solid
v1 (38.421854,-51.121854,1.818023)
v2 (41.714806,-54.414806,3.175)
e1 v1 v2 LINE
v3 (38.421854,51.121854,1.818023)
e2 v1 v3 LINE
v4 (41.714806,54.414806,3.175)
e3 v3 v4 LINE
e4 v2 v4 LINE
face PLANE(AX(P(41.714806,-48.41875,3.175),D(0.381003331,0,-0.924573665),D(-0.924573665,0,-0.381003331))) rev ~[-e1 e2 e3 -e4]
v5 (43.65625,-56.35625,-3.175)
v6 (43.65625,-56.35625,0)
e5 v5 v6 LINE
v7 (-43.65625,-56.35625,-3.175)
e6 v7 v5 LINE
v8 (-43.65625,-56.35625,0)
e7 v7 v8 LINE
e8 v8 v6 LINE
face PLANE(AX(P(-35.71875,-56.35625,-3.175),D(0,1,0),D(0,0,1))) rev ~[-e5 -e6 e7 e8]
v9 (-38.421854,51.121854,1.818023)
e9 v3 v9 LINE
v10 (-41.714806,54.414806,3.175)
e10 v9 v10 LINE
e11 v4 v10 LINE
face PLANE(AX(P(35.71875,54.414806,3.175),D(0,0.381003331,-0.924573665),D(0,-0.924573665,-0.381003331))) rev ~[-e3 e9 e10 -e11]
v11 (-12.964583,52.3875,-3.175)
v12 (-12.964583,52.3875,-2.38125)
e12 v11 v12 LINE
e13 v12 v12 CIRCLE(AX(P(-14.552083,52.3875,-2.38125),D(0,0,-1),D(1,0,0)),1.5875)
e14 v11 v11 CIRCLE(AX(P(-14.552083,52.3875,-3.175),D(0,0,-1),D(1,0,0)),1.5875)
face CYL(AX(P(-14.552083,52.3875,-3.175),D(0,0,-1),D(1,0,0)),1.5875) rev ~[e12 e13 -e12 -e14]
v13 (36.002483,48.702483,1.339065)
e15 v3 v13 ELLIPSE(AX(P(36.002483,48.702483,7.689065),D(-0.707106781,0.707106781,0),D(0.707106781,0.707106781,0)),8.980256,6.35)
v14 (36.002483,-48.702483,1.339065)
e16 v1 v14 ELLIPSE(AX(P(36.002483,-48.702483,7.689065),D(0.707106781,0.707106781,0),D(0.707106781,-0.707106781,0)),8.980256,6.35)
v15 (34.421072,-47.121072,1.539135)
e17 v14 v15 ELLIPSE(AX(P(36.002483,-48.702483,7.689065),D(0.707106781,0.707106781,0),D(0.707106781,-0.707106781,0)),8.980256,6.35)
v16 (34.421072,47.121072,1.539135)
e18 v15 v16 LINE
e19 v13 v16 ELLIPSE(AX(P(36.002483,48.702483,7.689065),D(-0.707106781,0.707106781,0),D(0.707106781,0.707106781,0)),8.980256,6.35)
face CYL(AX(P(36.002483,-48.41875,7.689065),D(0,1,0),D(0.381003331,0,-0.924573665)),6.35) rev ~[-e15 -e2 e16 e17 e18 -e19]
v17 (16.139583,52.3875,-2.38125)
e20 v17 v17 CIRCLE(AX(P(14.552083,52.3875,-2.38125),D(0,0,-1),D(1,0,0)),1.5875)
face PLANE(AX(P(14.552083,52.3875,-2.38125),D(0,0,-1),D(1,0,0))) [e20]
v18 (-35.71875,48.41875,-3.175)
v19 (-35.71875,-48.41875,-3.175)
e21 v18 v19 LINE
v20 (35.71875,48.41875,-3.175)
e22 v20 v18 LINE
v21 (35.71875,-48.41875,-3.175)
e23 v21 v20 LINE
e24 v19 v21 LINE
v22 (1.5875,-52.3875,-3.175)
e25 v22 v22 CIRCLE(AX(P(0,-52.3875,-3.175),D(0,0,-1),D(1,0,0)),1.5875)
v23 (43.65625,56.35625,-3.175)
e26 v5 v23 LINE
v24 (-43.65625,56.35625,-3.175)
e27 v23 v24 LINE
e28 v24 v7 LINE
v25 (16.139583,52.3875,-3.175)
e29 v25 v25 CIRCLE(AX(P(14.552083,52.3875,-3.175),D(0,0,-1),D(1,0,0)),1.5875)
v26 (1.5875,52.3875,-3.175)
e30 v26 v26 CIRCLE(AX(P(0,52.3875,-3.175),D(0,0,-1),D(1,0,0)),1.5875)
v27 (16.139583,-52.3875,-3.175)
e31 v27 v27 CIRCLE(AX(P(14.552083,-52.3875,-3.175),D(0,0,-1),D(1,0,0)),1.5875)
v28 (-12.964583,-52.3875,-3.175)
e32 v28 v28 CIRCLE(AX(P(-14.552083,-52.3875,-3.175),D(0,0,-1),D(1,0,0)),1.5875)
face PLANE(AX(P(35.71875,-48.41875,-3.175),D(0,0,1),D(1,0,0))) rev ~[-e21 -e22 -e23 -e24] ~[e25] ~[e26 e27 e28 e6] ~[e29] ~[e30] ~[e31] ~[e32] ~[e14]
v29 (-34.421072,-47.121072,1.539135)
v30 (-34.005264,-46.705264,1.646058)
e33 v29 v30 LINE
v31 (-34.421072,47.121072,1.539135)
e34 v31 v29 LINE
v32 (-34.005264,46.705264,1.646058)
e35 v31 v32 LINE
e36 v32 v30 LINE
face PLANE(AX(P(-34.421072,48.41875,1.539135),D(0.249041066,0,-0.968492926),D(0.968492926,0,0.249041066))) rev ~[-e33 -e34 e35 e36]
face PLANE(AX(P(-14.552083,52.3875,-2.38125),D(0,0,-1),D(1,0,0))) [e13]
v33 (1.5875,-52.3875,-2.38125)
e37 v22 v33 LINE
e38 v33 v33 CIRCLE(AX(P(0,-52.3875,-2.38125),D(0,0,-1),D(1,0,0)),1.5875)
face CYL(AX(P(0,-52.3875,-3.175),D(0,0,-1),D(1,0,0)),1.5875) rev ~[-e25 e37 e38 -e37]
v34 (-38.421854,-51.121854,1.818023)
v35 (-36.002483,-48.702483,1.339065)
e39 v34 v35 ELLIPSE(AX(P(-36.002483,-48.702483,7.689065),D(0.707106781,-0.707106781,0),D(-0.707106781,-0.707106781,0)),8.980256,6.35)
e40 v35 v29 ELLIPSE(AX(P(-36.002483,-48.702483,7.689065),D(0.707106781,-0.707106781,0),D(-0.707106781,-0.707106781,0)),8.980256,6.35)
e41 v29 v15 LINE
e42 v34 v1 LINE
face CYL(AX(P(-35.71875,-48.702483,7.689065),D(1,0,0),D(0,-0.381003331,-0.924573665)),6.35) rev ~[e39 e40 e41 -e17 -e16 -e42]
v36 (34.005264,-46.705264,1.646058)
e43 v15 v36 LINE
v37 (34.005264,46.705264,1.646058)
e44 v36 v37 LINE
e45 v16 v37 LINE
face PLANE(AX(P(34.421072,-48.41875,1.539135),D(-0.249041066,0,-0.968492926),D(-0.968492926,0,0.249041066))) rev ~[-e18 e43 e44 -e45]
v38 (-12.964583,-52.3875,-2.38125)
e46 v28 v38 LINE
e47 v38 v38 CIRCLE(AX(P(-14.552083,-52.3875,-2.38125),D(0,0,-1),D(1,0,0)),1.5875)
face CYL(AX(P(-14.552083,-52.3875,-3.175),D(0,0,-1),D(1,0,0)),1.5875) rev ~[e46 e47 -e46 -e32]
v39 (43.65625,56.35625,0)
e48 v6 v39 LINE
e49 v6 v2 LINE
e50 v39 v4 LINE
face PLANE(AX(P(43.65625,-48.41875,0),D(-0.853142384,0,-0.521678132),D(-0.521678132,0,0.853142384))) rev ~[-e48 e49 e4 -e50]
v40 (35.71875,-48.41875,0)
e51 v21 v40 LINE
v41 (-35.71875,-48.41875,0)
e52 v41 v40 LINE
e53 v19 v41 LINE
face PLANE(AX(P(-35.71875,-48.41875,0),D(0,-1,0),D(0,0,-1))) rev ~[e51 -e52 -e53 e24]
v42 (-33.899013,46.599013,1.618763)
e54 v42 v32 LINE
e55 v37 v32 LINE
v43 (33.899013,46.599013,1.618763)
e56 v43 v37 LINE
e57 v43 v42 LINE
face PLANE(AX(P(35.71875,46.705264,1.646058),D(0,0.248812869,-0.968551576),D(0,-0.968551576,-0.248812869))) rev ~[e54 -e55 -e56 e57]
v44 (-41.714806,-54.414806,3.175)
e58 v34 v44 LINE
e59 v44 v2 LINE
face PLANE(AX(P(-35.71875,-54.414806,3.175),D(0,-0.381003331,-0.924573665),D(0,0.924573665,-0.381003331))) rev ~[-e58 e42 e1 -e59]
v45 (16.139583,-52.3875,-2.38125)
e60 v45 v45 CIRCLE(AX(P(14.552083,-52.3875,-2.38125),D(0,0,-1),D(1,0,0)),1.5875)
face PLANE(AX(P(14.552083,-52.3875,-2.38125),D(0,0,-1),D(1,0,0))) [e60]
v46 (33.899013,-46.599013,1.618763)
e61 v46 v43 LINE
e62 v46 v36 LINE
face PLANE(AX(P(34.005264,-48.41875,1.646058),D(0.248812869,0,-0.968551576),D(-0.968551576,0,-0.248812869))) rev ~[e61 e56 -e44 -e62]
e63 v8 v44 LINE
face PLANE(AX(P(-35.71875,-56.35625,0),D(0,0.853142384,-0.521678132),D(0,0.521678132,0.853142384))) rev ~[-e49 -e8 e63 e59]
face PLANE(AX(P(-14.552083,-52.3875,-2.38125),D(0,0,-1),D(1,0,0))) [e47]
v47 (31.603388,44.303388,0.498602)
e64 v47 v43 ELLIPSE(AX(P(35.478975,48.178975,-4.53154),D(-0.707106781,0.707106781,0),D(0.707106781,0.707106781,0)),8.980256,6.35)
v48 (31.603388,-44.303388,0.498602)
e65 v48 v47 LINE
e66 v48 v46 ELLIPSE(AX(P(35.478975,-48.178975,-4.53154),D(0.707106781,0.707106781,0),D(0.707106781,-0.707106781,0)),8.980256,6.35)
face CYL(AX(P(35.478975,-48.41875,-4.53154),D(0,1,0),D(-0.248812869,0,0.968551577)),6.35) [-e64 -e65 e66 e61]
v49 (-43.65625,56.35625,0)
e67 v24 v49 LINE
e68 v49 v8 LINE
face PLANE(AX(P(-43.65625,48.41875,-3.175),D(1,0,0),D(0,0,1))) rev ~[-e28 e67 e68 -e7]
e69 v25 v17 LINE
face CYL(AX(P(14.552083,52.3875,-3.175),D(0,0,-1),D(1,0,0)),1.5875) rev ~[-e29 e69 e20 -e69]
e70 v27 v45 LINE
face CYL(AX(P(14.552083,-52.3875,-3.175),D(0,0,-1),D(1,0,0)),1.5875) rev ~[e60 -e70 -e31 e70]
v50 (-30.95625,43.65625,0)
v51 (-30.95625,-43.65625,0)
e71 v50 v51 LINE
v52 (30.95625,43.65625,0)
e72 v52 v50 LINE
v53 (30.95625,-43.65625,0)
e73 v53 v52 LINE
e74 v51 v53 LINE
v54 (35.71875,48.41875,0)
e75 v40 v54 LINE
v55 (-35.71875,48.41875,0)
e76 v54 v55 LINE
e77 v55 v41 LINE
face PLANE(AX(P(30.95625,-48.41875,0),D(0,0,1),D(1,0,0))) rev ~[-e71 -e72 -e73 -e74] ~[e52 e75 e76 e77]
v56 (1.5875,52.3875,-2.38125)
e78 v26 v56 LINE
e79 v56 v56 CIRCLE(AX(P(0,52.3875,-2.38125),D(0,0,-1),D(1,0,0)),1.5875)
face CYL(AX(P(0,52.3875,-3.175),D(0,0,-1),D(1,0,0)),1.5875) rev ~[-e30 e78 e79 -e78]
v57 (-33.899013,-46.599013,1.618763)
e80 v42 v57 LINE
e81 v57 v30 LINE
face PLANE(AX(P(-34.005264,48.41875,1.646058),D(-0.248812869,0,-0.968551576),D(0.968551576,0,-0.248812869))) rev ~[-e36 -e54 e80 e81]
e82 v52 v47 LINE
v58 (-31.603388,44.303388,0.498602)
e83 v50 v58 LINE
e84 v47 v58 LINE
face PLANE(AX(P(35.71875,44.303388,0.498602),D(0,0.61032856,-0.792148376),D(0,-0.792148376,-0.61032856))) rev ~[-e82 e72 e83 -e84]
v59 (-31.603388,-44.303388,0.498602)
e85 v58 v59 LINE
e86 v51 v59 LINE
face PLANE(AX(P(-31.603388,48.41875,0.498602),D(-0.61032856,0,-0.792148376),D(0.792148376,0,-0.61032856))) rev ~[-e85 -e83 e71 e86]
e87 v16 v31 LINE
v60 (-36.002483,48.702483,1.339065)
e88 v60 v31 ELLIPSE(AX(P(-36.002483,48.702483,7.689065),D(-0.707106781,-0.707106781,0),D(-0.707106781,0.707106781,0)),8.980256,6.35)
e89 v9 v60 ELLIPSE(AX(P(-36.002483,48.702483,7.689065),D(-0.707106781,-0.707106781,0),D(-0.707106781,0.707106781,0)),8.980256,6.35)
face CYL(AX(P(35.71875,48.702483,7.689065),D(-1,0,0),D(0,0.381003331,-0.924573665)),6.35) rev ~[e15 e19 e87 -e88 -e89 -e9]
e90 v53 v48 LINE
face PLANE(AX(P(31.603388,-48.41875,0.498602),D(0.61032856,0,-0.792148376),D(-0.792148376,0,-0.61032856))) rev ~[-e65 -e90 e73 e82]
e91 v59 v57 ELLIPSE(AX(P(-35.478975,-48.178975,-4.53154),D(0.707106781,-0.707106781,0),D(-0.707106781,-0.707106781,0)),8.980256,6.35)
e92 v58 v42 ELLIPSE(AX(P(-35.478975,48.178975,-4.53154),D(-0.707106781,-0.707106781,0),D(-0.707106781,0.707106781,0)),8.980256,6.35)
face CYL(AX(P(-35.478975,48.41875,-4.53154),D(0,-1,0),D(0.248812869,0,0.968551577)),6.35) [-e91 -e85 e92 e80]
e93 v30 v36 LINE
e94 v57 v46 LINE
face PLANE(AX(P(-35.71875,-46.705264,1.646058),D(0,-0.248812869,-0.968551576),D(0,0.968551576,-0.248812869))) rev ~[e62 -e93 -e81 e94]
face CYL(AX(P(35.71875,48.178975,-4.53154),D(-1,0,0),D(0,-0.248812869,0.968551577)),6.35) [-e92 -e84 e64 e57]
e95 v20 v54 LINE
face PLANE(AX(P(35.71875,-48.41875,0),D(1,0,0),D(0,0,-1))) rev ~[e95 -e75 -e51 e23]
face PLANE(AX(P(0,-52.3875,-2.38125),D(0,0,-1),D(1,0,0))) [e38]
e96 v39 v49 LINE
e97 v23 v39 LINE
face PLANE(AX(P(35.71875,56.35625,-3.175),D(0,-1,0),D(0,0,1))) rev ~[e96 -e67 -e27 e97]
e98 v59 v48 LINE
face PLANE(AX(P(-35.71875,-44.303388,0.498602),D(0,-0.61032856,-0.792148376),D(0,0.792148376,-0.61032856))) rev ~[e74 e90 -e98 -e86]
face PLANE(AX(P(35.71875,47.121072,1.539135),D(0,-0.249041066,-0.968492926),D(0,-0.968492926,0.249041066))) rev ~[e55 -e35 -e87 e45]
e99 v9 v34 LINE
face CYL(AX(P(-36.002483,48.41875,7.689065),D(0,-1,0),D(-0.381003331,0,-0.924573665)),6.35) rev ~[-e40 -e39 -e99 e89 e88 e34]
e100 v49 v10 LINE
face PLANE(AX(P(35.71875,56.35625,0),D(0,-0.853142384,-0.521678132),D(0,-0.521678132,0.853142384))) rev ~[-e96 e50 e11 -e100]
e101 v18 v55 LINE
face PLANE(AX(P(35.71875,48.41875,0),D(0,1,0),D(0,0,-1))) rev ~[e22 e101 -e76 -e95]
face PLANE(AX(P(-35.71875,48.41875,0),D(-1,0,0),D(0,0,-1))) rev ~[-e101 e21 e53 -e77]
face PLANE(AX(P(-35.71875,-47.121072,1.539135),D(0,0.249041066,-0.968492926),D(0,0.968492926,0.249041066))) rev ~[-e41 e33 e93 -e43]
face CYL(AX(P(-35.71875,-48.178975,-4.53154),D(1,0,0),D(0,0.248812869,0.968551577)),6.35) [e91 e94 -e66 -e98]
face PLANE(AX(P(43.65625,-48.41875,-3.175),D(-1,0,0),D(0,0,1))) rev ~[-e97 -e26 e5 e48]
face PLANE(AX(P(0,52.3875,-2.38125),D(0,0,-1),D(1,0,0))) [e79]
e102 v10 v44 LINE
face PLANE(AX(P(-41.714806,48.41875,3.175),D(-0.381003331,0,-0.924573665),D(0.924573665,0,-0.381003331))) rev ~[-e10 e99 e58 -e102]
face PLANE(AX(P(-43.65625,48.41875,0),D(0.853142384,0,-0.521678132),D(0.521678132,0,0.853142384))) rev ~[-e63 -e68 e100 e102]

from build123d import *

# Parameters (mm, degrees)
F4_R     = 1.5875
F5_DEPTH = 0.79375


# Not quite as in the source:
# - a length typed as a fraction of an inch, garbled in the dataset ("3 / 203.2 mm" for 3/8 in), is restored


with BuildPart() as f2:
    # F2: sweep along a path in F0
    with BuildLine(Plane.XY) as f2_path:
        Line((35.71875, -48.41875), (35.71875, 48.41875))
        Line((35.71875, 48.41875), (-35.71875, 48.41875))
        Line((-35.71875, 48.41875), (-35.71875, -48.41875))
        Line((-35.71875, -48.41875), (35.71875, -48.41875))
    # F1 (on Front) → F2 (sweep)
    with BuildSketch(Plane.XZ):
        with BuildLine():
            Line((31.6033883161, 0.4986022927), (30.95625, 0))
            Line((30.95625, 0), (35.71875, 0))
            Line((35.71875, 0), (35.71875, -3.175))
            Line((35.71875, -3.175), (43.65625, -3.175))
            Line((43.65625, -3.175), (43.65625, 0))
            Line((43.65625, 0), (41.7148061097, 3.175))
            Line((41.7148061097, 3.175), (38.4218543283, 1.8180225684))
            ThreePointArc((38.4218543283, 1.8180225684), (36.4440586883, 1.3544374061), (34.4210724061, 1.5391352618))
            Line((34.4210724061, 1.5391352618), (34.0052636218, 1.6460575328))
            Line((34.0052636218, 1.6460575328), (33.899012953, 1.618762617))
            ThreePointArc((33.899012953, 1.618762617), (32.6942949799, 1.1753032814), (31.6033883161, 0.4986022927))
        make_face()
    sweep(path=f2_path.line, transition=Transition.RIGHT)

    # F4 (on face) → F5 (cut)
    with BuildSketch(Plane(origin=(0, 0, -3.175), x_dir=(1, 0, 0), z_dir=(0, 0, -1))):
        with Locations((-14.5520833333, 52.3875)):
            Circle(F4_R)
        with Locations((0, 52.3875)):
            Circle(F4_R)
        with Locations((14.5520833333, 52.3875)):
            Circle(F4_R)
        with Locations((-14.5520833333, -52.3875)):
            Circle(F4_R)
        with Locations((0, -52.3875)):
            Circle(F4_R)
        with Locations((14.5520833333, -52.3875)):
            Circle(F4_R)
    extrude(amount=-F5_DEPTH, mode=Mode.SUBTRACT)


solid = f2.part
